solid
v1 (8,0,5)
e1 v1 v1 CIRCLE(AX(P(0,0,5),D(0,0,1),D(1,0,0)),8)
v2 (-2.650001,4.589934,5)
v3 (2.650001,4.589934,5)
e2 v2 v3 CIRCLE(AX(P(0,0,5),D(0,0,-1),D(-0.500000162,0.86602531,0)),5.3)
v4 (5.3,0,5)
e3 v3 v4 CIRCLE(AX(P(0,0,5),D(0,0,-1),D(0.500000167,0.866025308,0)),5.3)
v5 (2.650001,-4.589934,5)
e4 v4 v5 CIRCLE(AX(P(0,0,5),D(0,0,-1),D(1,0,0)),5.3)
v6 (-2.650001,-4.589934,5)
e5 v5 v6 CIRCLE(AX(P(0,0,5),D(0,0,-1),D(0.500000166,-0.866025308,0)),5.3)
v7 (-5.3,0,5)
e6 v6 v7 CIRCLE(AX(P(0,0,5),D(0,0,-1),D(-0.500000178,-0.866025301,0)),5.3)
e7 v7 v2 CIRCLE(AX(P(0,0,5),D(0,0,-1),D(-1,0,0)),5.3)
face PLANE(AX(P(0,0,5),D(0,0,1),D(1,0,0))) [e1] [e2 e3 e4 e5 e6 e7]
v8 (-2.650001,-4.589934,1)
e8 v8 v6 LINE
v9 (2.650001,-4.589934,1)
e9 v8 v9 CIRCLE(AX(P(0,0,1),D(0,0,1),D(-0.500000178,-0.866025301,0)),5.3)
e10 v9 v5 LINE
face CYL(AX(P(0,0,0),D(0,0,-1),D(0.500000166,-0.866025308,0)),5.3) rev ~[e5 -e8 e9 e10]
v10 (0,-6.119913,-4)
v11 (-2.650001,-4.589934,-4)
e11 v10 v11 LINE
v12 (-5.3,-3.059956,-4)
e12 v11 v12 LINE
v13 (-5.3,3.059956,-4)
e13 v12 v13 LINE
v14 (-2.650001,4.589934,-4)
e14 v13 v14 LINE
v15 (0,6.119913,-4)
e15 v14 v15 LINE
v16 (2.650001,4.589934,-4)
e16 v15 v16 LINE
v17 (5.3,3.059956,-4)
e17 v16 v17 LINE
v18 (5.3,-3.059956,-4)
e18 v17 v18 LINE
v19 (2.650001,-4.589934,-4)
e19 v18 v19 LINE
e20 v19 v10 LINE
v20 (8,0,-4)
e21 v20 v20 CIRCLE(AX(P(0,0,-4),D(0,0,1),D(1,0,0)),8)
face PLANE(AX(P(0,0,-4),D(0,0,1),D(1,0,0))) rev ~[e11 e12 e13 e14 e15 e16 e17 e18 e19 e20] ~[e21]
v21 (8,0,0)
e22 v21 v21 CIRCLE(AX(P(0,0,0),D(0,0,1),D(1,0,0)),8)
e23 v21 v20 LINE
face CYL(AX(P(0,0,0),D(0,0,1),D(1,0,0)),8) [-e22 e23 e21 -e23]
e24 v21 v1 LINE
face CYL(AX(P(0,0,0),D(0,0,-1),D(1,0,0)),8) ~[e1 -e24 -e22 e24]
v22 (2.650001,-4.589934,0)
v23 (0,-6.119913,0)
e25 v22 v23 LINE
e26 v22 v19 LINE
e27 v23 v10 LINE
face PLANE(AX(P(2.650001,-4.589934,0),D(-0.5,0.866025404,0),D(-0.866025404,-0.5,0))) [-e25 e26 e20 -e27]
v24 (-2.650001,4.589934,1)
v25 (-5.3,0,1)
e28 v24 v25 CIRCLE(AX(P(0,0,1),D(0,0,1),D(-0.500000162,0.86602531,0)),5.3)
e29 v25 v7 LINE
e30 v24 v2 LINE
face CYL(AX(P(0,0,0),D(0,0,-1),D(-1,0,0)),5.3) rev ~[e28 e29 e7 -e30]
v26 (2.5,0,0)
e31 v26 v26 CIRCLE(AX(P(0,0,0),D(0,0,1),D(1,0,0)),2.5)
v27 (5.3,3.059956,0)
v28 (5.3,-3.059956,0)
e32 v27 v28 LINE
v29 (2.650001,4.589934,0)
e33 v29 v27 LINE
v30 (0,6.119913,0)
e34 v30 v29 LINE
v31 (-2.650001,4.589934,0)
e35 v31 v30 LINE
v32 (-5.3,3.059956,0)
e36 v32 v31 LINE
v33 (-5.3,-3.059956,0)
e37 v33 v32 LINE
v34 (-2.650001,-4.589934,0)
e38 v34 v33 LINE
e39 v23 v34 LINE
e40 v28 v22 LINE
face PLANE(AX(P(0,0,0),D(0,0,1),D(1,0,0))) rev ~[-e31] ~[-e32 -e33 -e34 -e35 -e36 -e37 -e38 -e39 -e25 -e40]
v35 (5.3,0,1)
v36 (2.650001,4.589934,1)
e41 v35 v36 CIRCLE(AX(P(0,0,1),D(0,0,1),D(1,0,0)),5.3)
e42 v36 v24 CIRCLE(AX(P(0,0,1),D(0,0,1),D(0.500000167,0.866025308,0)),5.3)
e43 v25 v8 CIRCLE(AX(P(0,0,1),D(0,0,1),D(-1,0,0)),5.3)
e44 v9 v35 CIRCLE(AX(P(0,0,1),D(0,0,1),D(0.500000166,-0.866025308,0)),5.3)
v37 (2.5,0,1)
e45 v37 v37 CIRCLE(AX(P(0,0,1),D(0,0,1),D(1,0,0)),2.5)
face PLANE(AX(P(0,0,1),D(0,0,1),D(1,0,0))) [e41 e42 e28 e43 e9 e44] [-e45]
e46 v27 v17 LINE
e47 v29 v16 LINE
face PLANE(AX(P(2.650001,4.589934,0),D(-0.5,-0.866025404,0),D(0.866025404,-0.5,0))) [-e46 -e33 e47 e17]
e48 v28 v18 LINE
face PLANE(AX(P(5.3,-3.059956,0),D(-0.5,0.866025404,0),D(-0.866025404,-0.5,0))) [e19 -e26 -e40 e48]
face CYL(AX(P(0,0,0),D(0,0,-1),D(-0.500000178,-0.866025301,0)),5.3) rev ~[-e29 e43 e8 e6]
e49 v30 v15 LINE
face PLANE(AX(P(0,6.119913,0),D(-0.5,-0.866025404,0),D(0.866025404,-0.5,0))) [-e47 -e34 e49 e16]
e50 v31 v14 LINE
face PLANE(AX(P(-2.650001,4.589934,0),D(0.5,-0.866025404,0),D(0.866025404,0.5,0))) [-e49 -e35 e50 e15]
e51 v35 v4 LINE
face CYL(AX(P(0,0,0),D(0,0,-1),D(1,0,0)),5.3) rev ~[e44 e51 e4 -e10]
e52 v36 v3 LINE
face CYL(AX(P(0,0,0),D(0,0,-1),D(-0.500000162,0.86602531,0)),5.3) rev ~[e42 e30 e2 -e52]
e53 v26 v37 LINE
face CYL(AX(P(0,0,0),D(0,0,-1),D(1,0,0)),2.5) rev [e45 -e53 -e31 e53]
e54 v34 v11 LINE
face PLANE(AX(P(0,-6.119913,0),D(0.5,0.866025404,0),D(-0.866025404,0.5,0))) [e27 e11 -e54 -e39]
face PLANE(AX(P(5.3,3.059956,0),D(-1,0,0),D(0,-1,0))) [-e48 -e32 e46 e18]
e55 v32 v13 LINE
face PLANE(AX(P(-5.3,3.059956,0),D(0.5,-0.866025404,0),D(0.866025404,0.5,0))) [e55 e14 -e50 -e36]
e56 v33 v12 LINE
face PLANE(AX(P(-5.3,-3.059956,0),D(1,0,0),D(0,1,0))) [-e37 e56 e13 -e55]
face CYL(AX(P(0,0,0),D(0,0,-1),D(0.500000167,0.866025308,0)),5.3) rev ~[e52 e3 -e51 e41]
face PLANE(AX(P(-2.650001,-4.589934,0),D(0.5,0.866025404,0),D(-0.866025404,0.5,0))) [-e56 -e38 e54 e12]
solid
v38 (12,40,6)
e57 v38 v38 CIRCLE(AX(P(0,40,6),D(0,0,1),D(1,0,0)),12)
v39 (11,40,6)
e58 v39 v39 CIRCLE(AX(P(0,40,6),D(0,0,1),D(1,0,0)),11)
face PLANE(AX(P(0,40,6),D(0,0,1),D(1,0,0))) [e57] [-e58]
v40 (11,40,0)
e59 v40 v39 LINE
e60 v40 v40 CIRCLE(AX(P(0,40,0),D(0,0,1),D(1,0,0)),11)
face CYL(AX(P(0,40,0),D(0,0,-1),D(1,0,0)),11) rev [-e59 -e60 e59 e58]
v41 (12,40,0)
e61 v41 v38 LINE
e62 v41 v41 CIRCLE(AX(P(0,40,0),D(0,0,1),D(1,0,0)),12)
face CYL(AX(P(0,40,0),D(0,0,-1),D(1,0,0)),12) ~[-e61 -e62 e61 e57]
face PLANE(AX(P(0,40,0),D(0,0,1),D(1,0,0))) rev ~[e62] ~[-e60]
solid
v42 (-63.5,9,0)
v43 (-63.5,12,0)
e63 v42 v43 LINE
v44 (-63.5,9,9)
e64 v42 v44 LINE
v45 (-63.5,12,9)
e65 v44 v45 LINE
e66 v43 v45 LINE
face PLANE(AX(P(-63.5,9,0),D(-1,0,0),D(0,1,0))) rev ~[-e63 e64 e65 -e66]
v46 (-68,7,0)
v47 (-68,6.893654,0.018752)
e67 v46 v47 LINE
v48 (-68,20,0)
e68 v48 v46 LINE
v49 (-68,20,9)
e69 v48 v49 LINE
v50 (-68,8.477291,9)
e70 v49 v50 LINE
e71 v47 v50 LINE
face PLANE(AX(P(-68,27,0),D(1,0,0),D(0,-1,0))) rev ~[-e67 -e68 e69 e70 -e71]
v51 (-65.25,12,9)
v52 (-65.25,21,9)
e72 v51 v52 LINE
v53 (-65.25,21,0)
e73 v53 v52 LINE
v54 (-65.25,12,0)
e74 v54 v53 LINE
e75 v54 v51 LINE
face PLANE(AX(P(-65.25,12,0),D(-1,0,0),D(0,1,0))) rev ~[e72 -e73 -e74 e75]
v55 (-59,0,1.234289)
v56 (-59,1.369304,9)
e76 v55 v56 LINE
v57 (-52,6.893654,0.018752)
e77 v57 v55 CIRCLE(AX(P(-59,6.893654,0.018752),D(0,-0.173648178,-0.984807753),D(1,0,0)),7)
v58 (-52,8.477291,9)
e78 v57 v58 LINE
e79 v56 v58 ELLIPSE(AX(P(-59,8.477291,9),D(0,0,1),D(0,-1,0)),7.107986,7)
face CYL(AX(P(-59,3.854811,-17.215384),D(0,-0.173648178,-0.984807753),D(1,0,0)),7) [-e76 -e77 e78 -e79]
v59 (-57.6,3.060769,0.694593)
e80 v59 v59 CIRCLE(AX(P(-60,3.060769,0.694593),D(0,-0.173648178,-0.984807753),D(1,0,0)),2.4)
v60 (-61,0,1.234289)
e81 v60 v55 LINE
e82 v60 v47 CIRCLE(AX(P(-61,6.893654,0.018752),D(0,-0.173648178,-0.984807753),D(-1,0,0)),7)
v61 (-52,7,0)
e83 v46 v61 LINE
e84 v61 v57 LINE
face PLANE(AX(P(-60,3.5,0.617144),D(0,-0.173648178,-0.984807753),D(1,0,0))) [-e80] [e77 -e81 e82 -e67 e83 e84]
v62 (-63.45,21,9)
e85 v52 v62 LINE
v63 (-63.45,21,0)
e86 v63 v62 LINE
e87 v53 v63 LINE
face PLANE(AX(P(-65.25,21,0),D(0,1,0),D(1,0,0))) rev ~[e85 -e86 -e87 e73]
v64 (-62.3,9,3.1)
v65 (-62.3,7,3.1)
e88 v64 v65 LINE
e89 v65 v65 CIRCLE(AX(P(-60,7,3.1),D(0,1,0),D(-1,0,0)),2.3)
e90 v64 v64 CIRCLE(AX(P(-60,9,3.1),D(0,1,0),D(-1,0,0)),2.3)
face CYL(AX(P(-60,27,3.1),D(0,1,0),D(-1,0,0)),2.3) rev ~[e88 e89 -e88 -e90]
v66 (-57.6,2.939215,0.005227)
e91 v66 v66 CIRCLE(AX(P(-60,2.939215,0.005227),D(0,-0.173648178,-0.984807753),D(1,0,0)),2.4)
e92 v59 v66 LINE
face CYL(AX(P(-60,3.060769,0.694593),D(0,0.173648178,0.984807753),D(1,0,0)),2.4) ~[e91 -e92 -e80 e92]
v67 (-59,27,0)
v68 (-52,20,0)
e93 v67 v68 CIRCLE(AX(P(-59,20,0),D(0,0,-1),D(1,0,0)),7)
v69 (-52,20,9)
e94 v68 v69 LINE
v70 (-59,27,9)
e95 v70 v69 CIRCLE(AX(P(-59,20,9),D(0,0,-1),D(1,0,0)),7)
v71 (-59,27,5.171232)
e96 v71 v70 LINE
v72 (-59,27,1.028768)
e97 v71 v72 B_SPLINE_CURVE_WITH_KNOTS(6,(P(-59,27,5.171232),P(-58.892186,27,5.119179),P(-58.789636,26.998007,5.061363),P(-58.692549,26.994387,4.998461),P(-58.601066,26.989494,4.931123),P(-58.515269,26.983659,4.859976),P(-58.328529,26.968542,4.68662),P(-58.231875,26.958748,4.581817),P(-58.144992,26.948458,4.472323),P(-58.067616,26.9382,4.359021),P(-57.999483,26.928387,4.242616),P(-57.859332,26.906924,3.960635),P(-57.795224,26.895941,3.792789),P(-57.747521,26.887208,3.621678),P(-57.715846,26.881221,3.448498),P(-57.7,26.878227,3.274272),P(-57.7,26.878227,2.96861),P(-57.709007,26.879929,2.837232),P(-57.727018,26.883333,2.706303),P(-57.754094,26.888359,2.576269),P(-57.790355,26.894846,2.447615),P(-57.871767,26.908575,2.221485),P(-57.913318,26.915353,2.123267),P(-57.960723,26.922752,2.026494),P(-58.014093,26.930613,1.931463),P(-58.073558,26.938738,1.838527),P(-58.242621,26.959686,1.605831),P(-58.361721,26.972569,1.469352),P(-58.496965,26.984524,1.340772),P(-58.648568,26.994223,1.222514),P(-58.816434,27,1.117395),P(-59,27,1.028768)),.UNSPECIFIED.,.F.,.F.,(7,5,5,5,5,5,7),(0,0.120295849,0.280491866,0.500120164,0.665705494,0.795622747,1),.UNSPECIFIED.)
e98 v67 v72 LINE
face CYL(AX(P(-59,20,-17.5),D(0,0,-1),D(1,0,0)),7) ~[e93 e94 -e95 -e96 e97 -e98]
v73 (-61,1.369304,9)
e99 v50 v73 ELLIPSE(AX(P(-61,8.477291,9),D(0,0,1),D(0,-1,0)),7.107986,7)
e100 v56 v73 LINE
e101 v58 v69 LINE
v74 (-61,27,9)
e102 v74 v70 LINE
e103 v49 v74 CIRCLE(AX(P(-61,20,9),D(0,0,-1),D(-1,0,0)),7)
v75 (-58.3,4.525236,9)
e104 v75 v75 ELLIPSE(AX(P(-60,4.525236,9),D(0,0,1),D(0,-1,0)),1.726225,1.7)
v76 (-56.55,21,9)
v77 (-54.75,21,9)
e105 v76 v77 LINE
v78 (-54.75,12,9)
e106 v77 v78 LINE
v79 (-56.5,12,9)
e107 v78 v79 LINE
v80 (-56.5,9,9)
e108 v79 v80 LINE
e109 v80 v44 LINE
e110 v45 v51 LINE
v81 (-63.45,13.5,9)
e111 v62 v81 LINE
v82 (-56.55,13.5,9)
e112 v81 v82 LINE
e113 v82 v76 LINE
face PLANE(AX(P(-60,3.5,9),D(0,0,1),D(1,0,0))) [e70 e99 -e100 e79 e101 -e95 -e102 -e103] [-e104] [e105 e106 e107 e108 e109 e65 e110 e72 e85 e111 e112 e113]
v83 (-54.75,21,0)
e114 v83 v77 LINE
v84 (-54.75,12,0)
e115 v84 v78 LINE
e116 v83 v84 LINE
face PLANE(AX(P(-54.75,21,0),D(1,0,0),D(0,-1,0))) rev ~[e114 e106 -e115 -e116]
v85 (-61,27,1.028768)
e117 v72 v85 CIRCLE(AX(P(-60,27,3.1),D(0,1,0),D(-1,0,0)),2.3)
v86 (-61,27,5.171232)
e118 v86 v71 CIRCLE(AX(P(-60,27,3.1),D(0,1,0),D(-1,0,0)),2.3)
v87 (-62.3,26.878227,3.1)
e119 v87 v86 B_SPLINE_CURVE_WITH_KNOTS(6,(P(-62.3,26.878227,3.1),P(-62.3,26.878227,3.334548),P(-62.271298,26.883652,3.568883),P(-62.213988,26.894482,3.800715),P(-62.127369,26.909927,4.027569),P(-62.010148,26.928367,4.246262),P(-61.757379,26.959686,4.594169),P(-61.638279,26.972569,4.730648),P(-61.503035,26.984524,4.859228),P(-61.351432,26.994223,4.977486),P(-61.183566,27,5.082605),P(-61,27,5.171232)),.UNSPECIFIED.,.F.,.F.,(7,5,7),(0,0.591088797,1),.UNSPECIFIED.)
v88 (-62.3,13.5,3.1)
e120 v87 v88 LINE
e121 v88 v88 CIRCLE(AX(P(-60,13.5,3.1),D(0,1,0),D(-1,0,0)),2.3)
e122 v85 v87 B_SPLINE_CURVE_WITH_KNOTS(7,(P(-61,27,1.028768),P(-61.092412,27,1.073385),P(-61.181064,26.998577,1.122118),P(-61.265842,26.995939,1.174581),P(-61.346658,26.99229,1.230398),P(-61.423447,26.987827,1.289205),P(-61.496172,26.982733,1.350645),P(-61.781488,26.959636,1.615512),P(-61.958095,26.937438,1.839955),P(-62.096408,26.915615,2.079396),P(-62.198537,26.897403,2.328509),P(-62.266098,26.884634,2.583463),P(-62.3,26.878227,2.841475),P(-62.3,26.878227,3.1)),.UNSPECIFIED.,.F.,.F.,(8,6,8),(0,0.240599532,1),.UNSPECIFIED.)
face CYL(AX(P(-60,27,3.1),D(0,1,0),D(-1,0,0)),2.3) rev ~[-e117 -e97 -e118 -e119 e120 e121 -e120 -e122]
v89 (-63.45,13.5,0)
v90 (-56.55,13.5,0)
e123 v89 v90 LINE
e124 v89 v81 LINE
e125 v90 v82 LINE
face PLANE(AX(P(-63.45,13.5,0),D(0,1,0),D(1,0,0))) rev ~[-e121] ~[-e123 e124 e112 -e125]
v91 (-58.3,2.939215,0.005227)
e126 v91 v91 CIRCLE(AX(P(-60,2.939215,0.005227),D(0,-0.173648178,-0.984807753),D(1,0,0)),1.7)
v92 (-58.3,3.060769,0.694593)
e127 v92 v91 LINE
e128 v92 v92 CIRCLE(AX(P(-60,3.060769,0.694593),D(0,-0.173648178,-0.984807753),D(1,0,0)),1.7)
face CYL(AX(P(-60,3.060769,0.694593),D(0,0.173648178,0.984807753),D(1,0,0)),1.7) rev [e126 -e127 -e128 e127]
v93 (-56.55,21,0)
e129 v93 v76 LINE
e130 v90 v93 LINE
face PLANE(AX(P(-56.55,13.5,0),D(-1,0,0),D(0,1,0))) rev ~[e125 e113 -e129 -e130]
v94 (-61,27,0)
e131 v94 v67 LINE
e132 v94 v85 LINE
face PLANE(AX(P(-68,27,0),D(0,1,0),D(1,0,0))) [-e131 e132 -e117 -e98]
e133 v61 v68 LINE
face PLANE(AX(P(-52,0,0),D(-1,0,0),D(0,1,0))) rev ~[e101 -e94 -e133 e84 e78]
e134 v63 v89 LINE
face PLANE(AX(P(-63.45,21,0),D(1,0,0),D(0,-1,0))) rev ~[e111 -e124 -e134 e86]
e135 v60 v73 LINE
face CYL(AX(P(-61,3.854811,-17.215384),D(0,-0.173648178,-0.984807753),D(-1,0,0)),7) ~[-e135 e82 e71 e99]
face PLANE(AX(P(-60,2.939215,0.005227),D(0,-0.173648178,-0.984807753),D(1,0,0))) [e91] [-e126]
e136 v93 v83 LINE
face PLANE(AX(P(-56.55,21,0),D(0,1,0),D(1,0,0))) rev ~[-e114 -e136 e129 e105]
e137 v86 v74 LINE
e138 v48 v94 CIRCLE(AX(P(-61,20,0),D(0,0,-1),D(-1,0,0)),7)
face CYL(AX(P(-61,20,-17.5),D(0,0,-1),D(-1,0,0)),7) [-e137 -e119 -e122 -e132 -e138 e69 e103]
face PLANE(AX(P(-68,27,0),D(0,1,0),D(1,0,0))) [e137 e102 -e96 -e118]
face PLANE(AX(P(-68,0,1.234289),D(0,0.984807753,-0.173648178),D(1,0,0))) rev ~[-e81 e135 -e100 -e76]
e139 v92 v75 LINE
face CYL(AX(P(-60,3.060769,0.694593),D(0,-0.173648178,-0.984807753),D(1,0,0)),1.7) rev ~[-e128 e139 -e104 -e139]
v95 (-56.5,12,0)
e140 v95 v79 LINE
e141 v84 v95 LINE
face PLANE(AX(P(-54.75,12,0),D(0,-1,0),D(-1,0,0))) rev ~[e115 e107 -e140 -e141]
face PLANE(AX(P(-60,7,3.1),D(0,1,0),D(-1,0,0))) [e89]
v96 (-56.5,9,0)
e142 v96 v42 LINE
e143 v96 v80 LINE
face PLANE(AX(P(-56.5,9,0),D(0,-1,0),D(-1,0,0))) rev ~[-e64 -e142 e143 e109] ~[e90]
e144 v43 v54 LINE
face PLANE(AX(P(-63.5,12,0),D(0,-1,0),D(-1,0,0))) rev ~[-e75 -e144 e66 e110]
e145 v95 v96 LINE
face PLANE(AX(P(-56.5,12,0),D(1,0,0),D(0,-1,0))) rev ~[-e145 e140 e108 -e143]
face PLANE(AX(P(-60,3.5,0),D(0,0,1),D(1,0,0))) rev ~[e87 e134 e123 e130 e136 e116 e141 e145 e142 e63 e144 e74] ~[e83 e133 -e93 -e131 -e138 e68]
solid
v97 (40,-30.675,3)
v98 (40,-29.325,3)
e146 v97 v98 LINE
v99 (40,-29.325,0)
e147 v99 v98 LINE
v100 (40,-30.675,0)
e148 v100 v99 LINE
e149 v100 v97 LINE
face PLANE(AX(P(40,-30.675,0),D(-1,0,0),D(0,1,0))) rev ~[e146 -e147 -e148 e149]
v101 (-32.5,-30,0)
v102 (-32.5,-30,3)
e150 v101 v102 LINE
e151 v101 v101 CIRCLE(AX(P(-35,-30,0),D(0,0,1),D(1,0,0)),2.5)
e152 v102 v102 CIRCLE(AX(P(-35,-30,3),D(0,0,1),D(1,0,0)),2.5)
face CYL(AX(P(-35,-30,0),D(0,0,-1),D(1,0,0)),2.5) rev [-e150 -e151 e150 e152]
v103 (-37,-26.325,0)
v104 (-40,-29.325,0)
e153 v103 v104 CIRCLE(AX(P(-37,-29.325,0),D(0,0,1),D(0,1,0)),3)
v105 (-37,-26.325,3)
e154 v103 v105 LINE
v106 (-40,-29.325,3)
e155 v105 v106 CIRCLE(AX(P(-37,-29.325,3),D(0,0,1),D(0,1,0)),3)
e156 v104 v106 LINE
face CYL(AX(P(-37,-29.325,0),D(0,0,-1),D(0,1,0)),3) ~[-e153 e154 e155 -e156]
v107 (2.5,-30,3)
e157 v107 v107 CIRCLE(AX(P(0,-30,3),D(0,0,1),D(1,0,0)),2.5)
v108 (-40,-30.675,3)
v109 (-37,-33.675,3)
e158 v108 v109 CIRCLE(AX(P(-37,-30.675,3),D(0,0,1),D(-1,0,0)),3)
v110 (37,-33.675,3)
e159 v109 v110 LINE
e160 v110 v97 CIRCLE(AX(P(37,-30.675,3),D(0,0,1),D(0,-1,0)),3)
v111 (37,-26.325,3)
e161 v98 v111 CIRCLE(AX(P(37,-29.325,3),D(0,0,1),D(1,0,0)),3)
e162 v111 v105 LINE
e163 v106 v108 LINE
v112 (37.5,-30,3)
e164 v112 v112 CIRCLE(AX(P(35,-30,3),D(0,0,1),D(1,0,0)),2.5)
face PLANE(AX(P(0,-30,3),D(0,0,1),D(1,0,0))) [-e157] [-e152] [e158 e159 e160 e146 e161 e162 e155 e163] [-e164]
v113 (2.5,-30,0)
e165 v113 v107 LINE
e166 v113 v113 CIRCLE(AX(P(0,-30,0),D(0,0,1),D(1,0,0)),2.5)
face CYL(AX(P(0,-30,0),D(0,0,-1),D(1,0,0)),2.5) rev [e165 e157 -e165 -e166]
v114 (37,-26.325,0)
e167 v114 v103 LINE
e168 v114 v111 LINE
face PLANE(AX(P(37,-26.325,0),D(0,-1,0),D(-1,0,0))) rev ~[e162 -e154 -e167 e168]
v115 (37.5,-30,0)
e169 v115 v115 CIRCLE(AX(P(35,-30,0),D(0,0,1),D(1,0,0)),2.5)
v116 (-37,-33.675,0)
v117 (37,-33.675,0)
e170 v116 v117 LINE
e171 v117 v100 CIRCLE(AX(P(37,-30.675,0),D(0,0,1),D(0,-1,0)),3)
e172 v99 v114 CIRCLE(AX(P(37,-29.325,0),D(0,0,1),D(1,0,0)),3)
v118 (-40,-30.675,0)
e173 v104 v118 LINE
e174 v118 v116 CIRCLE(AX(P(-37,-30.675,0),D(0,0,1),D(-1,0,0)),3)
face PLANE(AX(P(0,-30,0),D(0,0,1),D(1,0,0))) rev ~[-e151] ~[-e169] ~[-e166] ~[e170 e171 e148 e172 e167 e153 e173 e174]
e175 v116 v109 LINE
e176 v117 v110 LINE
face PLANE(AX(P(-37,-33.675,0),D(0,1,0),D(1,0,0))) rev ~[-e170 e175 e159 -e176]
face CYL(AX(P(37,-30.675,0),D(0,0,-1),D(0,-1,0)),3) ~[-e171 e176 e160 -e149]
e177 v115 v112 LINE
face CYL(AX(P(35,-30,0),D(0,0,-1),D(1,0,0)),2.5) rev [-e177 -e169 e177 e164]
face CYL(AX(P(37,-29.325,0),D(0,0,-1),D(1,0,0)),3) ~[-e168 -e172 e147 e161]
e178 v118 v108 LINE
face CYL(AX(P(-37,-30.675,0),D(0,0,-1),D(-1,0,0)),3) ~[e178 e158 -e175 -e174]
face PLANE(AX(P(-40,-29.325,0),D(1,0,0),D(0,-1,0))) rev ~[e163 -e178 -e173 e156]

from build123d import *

# Parameters (mm, degrees)
F0_R         = 8
F1_DEPTH     = 4
F2_DEPTH     = 5
F0_R_2       = 2.5
F3_DEPTH     = 1
F4_DEPTH     = 3
F0_R_3       = 12
F0_R_4       = 11
F5_DEPTH     = 6
F0_W         = 16
F0_H         = 7
F0_H_2       = 20
F6_DEPTH     = 9
F8_W         = 16
F8_H         = 7.1079862832
F8_R         = 2.4
F8_R_2       = 1.7
F9_DEPTH     = 11.0033706387
F10_DEPTH    = 16.6784377721
F11_DEPTH    = 0.7
F12_R        = 2.3
F13_DEPTH    = 20
F8_H_2       = 1.3485015869
F14_DEPTH    = 16.6784377721
F15_T1_DEPTH = 44
F15_T3_DEPTH = 42.8855097467


# Not quite as in the source:
# - a fillet or chamfer that OpenCascade refuses, or shapes differently, is made with other operations: its cross-section is extruded or revolved along the edge and cut away or added


with BuildPart() as f1:
    # F0 (on Top) → F1 (new body)
    with BuildSketch(Plane.XY):
        Circle(F0_R)
        Polygon((5.3, 3.0599564267), (5.3, 0), (5.3, -3.0599564267), (2.6500008794, -4.5899341324), (0, -6.1199128534), (-2.6500009439, -4.5899340951), (-5.3, -3.0599564267), (-5.3, 0), (-5.3, 3.0599564267), (-2.6500008588, 4.5899341442), (0, 6.1199128534), (2.6500008831, 4.5899341302), align=None, mode=Mode.SUBTRACT)
    extrude(amount=-F1_DEPTH)

    # F0 (on Top) → F2 (join)
    with BuildSketch(Plane.XY):
        Circle(F0_R)
        Polygon((5.3, 3.0599564267), (5.3, 0), (5.3, -3.0599564267), (2.6500008794, -4.5899341324), (0, -6.1199128534), (-2.6500009439, -4.5899340951), (-5.3, -3.0599564267), (-5.3, 0), (-5.3, 3.0599564267), (-2.6500008588, 4.5899341442), (0, 6.1199128534), (2.6500008831, 4.5899341302), align=None, mode=Mode.SUBTRACT)
        with BuildLine():
            Line((0, -6.1199128534), (2.6500008794, -4.5899341324))
            ThreePointArc((2.6500008794, -4.5899341324), (-3.73e-08, -5.3), (-2.6500009439, -4.5899340951))
            Line((-2.6500009439, -4.5899340951), (0, -6.1199128534))
        make_face()
        with BuildLine():
            Line((-5.3, -3.0599564267), (-2.6500009439, -4.5899340951))
            ThreePointArc((-2.6500009439, -4.5899340951), (-4.5899349125, -2.6499995281), (-5.3, 0))
            Line((-5.3, 0), (-5.3, -3.0599564267))
        make_face()
        with BuildLine():
            ThreePointArc((-5.3, 0), (-4.589934888, 2.6499995706), (-2.6500008588, 4.5899341442))
            Line((-2.6500008588, 4.5899341442), (-5.3, 3.0599564267))
            Line((-5.3, 3.0599564267), (-5.3, 0))
        make_face()
        with BuildLine():
            Line((5.3, -3.0599564267), (5.3, 0))
            ThreePointArc((5.3, 0), (4.5899348939, -2.6499995603), (2.6500008794, -4.5899341324))
            Line((2.6500008794, -4.5899341324), (5.3, -3.0599564267))
        make_face()
        with BuildLine():
            ThreePointArc((2.6500008831, 4.5899341302), (4.589934895, 2.6499995585), (5.3, 0))
            Line((5.3, 0), (5.3, 3.0599564267))
            Line((5.3, 3.0599564267), (2.6500008831, 4.5899341302))
        make_face()
        with BuildLine():
            ThreePointArc((-2.6500008588, 4.5899341442), (1.4e-08, 5.3), (2.6500008831, 4.5899341302))
            Line((2.6500008831, 4.5899341302), (0, 6.1199128534))
            Line((0, 6.1199128534), (-2.6500008588, 4.5899341442))
        make_face()
    extrude(amount=F2_DEPTH)

    # F0 (on Top) → F3 (join)
    with BuildSketch(Plane.XY):
        with BuildLine():
            ThreePointArc((2.6500008794, -4.5899341324), (4.5899348939, -2.6499995603), (5.3, 0))
            ThreePointArc((5.3, 0), (4.589934895, 2.6499995585), (2.6500008831, 4.5899341302))
            ThreePointArc((2.6500008831, 4.5899341302), (1.4e-08, 5.3), (-2.6500008588, 4.5899341442))
            ThreePointArc((-2.6500008588, 4.5899341442), (-4.589934888, 2.6499995706), (-5.3, 0))
            ThreePointArc((-5.3, 0), (-4.5899349125, -2.6499995281), (-2.6500009439, -4.5899340951))
            ThreePointArc((-2.6500009439, -4.5899340951), (-3.73e-08, -5.3), (2.6500008794, -4.5899341324))
        make_face()
        Circle(F0_R_2, mode=Mode.SUBTRACT)
    extrude(amount=F3_DEPTH)


with BuildPart() as f4:
    # F0 (on Top) → F4 (new body)
    with BuildSketch(Plane.XY):
        with BuildLine():
            Line((-37, -33.675), (37, -33.675))
            ThreePointArc((37, -33.675), (39.1213203436, -32.7963203436), (40, -30.675))
            Line((40, -30.675), (40, -29.325))
            ThreePointArc((40, -29.325), (39.1213203436, -27.2036796564), (37, -26.325))
            Line((37, -26.325), (-37, -26.325))
            ThreePointArc((-37, -26.325), (-39.1213203436, -27.2036796564), (-40, -29.325))
            Line((-40, -29.325), (-40, -30.675))
            ThreePointArc((-40, -30.675), (-39.1213203436, -32.7963203436), (-37, -33.675))
        make_face()
        with Locations((-35, -30)):
            Circle(F0_R_2, mode=Mode.SUBTRACT)
        with Locations((0, -30)):
            Circle(F0_R_2, mode=Mode.SUBTRACT)
        with Locations((35, -30)):
            Circle(F0_R_2, mode=Mode.SUBTRACT)
    extrude(amount=F4_DEPTH)


with BuildPart() as f5:
    # F0 (on Top) → F5 (new body)
    with BuildSketch(Plane.XY):
        with Locations((0, 40)):
            Circle(F0_R_3)
        with Locations((0, 40)):
            Circle(F0_R_4, mode=Mode.SUBTRACT)
    extrude(amount=F5_DEPTH)


with BuildPart() as f6:
    # F0 (on Top) → F6 (new body)
    with BuildSketch(Plane.XY):
        with Locations((-60, 3.5)):
            Rectangle(F0_W, F0_H)
        with Locations((-60, 17)):
            Rectangle(F0_W, F0_H_2)
        Polygon((-65.25, 12), (-65.25, 21), (-63.45, 21), (-63.45, 13.5), (-56.55, 13.5), (-56.55, 21), (-54.75, 21), (-54.75, 12), (-56.5, 12), (-56.5, 9), (-63.5, 9), (-63.5, 12), align=None, mode=Mode.SUBTRACT)
    extrude(amount=F6_DEPTH)

    # F8 (on line) → F9 (cut, through all)
    with BuildSketch(Plane(origin=(0, 0.2110758272, 1.1970705016), x_dir=(1, 0, 0), z_dir=(0, -0.1736481777, -0.984807753))):
        with Locations((-60, -3.3396611295)):
            Rectangle(F8_W, F8_H)
        with Locations((-60, -2.8936542711)):
            Circle(F8_R, mode=Mode.SUBTRACT)
        with Locations((-60, -2.8936542711)):
            Circle(F8_R)
        with Locations((-60, -2.8936542711)):
            Circle(F8_R_2, mode=Mode.SUBTRACT)
        with Locations((-60, -2.8936542711)):
            Circle(F8_R_2)
    extrude(amount=F9_DEPTH, mode=Mode.SUBTRACT)

    # F8 (on line) → F10 (cut, through all)
    with BuildSketch(Plane(origin=(0, 0.2110758272, 1.1970705016), x_dir=(1, 0, 0), z_dir=(0, -0.1736481777, -0.984807753))):
        with Locations((-60, -2.8936542711)):
            Circle(F8_R_2)
    extrude(amount=-F10_DEPTH, mode=Mode.SUBTRACT)

    # F8 (on line) → F11 (join)
    with BuildSketch(Plane(origin=(0, 0.2110758272, 1.1970705016), x_dir=(1, 0, 0), z_dir=(0, -0.1736481777, -0.984807753))):
        with Locations((-60, -2.8936542711)):
            Circle(F8_R)
        with Locations((-60, -2.8936542711)):
            Circle(F8_R_2, mode=Mode.SUBTRACT)
    extrude(amount=F11_DEPTH)

    # F12 (on face) → F13 (cut)
    with BuildSketch(Plane(origin=(0, 27, 0), x_dir=(-1, 0, 0), z_dir=(0, 1, 0))):
        with Locations((60, 3.1)):
            Circle(F12_R)
    extrude(amount=-F13_DEPTH, mode=Mode.SUBTRACT)

    # F8 (on line) → F14 (cut, through all)
    with BuildSketch(Plane(origin=(0, 0.2110758272, 1.1970705016), x_dir=(1, 0, 0), z_dir=(0, -0.1736481777, -0.984807753))):
        with Locations((-60, 0.8885828056)):
            Rectangle(F8_W, F8_H_2)
    extrude(amount=-F14_DEPTH, mode=Mode.SUBTRACT)

    # F15: fillet of radius 7 on 4 edges, made by hand

    # F15_s2 → F15_t1 (cut)
    with BuildSketch(Plane.XY.offset(-17.5)):
        with BuildLine():
            ThreePointArc((-52, 20), (-54.0502525317, 24.9497474683), (-59, 27))
            Line((-59, 27), (-52, 27))
            Line((-52, 27), (-52, 20))
        make_face()
        with BuildLine():
            ThreePointArc((-68, 20), (-65.9497474683, 24.9497474683), (-61, 27))
            Line((-61, 27), (-68, 27))
            Line((-68, 27), (-68, 20))
        make_face()
    extrude(amount=F15_T1_DEPTH, mode=Mode.SUBTRACT)

    # F15_s4 → F15_t3 (cut)
    with BuildSketch(Plane(origin=(0, -2.8277672819, -16.0370651761), x_dir=(1, 0, 0), z_dir=(0, 0.1736481777, 0.984807753))):
        with BuildLine():
            ThreePointArc((-52, 6.7856679879), (-54.0502525317, 1.8359205196), (-59, -0.2143320121))
            Line((-59, -0.2143320121), (-52, -0.2143320121))
            Line((-52, -0.2143320121), (-52, 6.7856679879))
        make_face()
        with BuildLine():
            ThreePointArc((-68, 6.7856679879), (-65.9497474683, 1.8359205196), (-61, -0.2143320121))
            Line((-61, -0.2143320121), (-68, -0.2143320121))
            Line((-68, -0.2143320121), (-68, 6.7856679879))
        make_face()
    extrude(amount=F15_T3_DEPTH, mode=Mode.SUBTRACT)


solid = Compound([f1.part, f4.part, f5.part, f6.part])
